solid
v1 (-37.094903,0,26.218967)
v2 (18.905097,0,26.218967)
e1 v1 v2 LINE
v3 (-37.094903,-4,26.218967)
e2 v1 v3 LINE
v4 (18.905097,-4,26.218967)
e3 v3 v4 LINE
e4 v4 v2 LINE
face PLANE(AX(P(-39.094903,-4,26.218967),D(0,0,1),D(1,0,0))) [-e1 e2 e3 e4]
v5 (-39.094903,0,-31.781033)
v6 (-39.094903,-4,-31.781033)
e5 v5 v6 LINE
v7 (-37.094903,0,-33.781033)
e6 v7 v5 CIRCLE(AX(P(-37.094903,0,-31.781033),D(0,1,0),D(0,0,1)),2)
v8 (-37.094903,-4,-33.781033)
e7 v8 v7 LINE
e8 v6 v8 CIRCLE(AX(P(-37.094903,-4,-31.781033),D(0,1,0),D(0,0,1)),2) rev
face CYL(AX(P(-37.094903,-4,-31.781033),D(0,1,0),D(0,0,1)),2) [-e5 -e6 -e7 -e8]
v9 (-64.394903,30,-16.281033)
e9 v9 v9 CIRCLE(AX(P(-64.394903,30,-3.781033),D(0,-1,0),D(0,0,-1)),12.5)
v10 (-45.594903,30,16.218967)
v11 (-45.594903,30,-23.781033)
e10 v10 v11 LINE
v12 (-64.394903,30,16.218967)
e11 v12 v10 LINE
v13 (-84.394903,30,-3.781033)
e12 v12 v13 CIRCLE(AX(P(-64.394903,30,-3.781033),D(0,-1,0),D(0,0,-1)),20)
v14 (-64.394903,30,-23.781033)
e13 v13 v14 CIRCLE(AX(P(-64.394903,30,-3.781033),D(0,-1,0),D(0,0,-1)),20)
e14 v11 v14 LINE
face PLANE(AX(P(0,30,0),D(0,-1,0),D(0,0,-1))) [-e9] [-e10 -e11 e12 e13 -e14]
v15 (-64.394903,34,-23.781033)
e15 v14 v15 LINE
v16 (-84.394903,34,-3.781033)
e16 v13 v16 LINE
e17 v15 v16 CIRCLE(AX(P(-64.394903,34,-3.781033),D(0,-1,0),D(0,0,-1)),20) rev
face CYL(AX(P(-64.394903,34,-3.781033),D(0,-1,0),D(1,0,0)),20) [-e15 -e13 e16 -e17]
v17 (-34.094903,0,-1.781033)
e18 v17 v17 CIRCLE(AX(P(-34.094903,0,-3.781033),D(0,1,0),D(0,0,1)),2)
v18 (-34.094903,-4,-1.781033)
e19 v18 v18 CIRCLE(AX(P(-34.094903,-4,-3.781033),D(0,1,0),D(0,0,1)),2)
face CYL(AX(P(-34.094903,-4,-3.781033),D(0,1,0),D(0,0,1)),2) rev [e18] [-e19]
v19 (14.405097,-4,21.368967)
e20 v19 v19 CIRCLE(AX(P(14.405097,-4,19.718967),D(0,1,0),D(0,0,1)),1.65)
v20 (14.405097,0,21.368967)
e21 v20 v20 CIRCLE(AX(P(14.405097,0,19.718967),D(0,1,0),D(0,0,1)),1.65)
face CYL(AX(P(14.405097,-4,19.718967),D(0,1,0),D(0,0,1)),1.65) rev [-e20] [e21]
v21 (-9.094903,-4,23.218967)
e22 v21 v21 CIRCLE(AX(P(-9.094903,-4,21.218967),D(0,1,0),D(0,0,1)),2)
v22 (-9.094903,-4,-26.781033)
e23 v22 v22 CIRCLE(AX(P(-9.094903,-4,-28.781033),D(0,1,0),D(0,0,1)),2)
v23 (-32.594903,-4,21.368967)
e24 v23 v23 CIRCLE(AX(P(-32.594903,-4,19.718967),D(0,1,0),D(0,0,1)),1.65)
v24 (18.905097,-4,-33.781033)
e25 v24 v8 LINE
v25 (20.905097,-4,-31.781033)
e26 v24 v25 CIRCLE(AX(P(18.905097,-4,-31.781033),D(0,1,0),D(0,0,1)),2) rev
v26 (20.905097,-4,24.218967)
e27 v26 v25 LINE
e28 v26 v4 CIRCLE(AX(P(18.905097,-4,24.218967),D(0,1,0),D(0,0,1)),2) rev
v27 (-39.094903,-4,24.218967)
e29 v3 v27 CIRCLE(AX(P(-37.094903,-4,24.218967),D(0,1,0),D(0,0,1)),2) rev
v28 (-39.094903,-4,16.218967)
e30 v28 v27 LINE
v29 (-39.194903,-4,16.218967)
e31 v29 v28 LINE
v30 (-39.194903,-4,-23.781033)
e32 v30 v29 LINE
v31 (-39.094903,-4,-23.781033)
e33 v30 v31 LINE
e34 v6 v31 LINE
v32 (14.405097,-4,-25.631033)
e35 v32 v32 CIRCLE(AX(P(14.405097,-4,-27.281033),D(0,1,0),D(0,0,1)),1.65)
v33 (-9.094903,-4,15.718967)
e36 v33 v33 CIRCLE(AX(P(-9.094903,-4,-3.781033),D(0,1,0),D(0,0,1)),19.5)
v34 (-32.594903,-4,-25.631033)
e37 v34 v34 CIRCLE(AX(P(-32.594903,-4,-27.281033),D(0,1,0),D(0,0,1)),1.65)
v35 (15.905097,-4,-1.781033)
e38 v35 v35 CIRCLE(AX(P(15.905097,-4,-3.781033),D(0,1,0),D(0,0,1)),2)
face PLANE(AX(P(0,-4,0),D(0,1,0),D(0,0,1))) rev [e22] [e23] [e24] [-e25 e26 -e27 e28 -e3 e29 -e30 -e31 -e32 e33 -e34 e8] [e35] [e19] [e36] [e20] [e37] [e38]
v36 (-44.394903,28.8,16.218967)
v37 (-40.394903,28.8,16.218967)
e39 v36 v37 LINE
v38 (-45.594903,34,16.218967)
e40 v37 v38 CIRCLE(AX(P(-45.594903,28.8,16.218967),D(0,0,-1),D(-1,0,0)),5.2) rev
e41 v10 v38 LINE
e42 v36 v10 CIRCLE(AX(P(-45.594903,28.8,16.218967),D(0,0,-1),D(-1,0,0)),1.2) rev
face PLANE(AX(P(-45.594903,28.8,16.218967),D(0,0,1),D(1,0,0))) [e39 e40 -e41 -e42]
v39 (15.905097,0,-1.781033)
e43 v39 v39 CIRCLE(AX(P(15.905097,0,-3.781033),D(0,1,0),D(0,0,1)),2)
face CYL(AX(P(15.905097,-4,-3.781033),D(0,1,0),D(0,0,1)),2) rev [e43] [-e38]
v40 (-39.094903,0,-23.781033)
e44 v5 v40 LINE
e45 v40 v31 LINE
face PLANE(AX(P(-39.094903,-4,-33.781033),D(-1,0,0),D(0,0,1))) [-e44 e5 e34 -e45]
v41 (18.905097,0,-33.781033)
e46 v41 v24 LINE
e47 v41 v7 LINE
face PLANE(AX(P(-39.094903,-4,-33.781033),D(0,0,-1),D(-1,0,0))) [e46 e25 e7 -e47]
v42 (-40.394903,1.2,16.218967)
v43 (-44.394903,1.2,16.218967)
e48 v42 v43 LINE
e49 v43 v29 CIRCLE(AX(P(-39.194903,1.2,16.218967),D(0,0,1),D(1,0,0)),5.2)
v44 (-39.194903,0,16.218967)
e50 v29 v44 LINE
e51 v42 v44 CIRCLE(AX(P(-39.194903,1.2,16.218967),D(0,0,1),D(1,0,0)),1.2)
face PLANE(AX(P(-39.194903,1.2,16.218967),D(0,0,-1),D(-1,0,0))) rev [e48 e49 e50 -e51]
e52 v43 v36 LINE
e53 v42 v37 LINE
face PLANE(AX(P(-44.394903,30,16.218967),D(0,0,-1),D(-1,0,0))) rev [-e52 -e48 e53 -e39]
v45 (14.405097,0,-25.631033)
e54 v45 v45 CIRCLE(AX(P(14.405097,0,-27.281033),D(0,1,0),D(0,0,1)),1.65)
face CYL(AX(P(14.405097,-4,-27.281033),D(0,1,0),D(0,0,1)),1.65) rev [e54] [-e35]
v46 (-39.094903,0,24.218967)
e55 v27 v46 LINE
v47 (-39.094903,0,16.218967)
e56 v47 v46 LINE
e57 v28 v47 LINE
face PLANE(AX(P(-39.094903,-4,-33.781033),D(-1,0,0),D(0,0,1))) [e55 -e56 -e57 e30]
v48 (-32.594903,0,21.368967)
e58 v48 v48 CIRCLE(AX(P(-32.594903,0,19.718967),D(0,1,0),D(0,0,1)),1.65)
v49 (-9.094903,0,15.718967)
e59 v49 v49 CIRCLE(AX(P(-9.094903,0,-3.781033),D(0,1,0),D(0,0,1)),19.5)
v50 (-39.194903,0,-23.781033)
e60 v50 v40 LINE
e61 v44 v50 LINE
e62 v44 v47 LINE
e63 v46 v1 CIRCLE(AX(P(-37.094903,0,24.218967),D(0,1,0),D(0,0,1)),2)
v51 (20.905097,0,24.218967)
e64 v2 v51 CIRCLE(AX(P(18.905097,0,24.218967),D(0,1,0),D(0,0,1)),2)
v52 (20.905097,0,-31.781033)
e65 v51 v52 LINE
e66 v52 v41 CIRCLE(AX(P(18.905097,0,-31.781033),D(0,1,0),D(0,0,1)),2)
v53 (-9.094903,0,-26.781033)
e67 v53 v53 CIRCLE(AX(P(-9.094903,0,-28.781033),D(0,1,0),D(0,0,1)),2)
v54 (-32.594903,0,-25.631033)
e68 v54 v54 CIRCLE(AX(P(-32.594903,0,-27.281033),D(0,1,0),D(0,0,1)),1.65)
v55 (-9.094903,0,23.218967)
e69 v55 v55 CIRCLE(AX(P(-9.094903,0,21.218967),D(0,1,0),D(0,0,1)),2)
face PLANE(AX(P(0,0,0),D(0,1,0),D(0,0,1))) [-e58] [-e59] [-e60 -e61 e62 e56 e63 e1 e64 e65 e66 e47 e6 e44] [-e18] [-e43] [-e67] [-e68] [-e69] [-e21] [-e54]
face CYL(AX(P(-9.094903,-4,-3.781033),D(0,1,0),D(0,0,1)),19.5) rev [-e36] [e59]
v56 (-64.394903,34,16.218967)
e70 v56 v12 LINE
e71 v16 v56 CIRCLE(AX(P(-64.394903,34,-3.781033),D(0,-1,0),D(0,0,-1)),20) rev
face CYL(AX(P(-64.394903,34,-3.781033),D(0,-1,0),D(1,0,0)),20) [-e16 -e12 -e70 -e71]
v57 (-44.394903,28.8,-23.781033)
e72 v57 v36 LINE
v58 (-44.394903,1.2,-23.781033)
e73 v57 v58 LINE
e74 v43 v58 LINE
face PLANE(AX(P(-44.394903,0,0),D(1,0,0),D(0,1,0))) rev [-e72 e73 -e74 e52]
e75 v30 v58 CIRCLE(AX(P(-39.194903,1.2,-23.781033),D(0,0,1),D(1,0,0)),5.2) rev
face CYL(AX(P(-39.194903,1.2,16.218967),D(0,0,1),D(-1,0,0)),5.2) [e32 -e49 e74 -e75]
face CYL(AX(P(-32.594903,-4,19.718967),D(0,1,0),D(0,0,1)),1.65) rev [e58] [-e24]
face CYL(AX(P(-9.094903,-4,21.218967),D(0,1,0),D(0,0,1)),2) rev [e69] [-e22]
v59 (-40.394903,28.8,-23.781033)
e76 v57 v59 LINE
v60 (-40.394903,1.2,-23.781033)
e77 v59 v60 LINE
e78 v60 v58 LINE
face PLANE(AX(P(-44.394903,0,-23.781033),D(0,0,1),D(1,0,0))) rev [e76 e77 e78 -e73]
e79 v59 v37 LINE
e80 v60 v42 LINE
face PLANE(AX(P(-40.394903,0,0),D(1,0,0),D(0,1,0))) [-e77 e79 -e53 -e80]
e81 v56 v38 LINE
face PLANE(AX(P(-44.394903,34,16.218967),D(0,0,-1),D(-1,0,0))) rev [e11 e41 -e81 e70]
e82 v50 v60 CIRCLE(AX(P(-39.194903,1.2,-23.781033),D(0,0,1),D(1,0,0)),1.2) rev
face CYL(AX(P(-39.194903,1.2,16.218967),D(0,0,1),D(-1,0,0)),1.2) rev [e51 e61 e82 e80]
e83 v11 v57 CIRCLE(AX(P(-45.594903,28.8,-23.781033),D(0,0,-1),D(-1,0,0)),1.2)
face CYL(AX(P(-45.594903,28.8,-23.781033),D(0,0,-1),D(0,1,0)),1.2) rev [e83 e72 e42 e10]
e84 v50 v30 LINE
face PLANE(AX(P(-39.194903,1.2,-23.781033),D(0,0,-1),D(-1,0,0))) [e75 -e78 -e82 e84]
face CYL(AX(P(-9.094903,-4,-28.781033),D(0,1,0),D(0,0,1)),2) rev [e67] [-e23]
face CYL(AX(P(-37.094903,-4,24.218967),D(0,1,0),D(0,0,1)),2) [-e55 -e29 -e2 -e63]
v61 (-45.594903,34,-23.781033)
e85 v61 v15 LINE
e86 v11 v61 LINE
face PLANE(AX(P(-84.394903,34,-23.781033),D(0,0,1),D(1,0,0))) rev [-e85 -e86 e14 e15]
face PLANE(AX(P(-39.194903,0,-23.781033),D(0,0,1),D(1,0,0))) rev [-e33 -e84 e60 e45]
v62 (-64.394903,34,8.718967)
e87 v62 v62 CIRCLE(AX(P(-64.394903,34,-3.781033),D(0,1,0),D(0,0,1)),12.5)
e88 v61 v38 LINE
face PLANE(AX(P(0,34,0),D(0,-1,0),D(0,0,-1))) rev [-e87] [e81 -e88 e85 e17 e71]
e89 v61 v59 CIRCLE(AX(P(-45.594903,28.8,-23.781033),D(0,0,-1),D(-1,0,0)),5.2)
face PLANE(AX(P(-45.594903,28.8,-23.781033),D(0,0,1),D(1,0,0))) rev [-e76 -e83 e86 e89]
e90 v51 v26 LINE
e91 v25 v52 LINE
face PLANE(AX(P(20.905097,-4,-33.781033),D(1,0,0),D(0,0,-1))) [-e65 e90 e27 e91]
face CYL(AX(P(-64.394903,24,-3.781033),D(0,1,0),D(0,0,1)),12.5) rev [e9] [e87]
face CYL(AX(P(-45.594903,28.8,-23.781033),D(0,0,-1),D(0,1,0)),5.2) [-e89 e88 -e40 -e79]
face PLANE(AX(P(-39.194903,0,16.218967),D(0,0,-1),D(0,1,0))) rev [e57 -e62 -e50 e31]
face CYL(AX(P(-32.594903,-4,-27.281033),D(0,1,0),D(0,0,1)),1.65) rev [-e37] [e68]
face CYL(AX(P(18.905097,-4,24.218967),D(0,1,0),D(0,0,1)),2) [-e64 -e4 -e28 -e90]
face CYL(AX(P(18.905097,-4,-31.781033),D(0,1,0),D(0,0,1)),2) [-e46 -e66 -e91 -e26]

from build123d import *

# Parameters (mm, degrees)
SKETCH_1_W                       = 60
SKETCH_1_H                       = 60
SKETCH_1_R                       = 1.65
SKETCH_1_R_2                     = 19.5
SKETCH_1_R_3                     = 2
SM_BASE_FLANGE_1_DEPTH           = 4
SKETCH_4_W                       = 40
SKETCH_4_H                       = 4
EXTRUDE_1_DEPTH                  = 0.1
SM_EDGE_FLANGE_1_DEPTH           = 40
SM_EDGE_FLANGE_2_STRIP_W         = 18.4
SM_EDGE_FLANGE_2_STRIP_H         = 4
SM_EDGE_FLANGE_2_STRIP_CUT_DEPTH = 40
SM_EDGE_FLANGE_2_DEPTH           = 40
FILLET_1_R                       = 2
SKETCH_11_R                      = 12.5
CUT_EXTRUDE_1_DEPTH              = 10
FILLET_2_R                       = 20


# Sheet-metal steps are written as plain solids
with BuildPart() as part:
    # Sketch 1 → Базовая кромка1 (new body)
    with BuildSketch(Plane(origin=(0, 0, 0), x_dir=(1, 0, 0), z_dir=(0, 1, 0))):
        with Locations((-9.094903125, 3.781032797)):
            Rectangle(SKETCH_1_W, SKETCH_1_H)
        with Locations(Location((-32.594903125, 27.281032797, 0), (0, 0, 270))):
            Circle(SKETCH_1_R, mode=Mode.SUBTRACT)
        with Locations(Location((14.405096875, 27.281032797, 0), (0, 0, 270))):
            Circle(SKETCH_1_R, mode=Mode.SUBTRACT)
        with Locations(Location((-32.594903125, -19.718967203, 0), (0, 0, 270))):
            Circle(SKETCH_1_R, mode=Mode.SUBTRACT)
        with Locations(Location((14.405096875, -19.718967203, 0), (0, 0, 270))):
            Circle(SKETCH_1_R, mode=Mode.SUBTRACT)
        with Locations(Location((-9.094903125, 3.781032797, 0), (0, 0, 270))):
            Circle(SKETCH_1_R_2, mode=Mode.SUBTRACT)
        with Locations(Location((-34.094903125, 3.781032797, 0), (0, 0, 270))):
            Circle(SKETCH_1_R_3, mode=Mode.SUBTRACT)
        with Locations(Location((15.905096875, 3.781032797, 0), (0, 0, 270))):
            Circle(SKETCH_1_R_3, mode=Mode.SUBTRACT)
        with Locations(Location((-9.094903125, 28.781032797, 0), (0, 0, 270))):
            Circle(SKETCH_1_R_3, mode=Mode.SUBTRACT)
        with Locations(Location((-9.094903125, -21.218967203, 0), (0, 0, 270))):
            Circle(SKETCH_1_R_3, mode=Mode.SUBTRACT)
    extrude(amount=-SM_BASE_FLANGE_1_DEPTH)

    # Эскиз4 → Бобышка-Вытянуть1 (add)
    with BuildSketch(Plane.ZY.offset(39.094903125)):
        with Locations((-3.781032797, -2)):
            Rectangle(SKETCH_4_W, SKETCH_4_H)
    extrude(amount=EXTRUDE_1_DEPTH)

    # Ребро-кромка1 section (across the edge) → Ребро-кромка1 (add)
    with BuildSketch(Plane(origin=(-40.394903125, 0, -23.781032797), x_dir=(1, 0, 0), z_dir=(0, 0, 1))):
        with BuildLine():
            Line((-4, 1.2), (-4, 30))
            Line((-4, 30), (0, 30))
            Line((0, 30), (0, 1.2))
            ThreePointArc((0, 1.2), (0.351471863, 0.351471863), (1.2, 0))
            Line((1.2, 0), (1.2, -4))
            ThreePointArc((1.2, -4), (-2.476955262, -2.476955262), (-4, 1.2))
        make_face()
    extrude(amount=SM_EDGE_FLANGE_1_DEPTH)

    # Ребро-кромка2 strip (across the edge) → Ребро-кромка2 strip cut (cut)
    with BuildSketch(Plane(origin=(-44.394903125, 30, 16.218967203), x_dir=(0, -1, 0), z_dir=(0, 0, -1))):
        with Locations((-8, -2)):
            Rectangle(SM_EDGE_FLANGE_2_STRIP_W, SM_EDGE_FLANGE_2_STRIP_H)
    extrude(amount=SM_EDGE_FLANGE_2_STRIP_CUT_DEPTH, mode=Mode.SUBTRACT)

    # Ребро-кромка2 section (across the edge) → Ребро-кромка2 (add)
    with BuildSketch(Plane(origin=(-44.394903125, 30, 16.218967203), x_dir=(0, -1, 0), z_dir=(0, 0, -1))):
        with BuildLine():
            Line((-4, 1.2), (-4, 40))
            Line((-4, 40), (0, 40))
            Line((0, 40), (0, 1.2))
            ThreePointArc((0, 1.2), (0.351471863, 0.351471863), (1.2, 0))
            Line((1.2, 0), (1.2, -4))
            ThreePointArc((1.2, -4), (-2.476955262, -2.476955262), (-4, 1.2))
        make_face()
    extrude(amount=SM_EDGE_FLANGE_2_DEPTH)

    # Скругление1
    fillet_1_edges = [part.edges().sort_by_distance(p)[0] for p in [
        (-39.094903125, -2, -33.781032797),
        (20.905096875, -2, -33.781032797),
        (20.905096875, -2, 26.218967203),
        (-39.094903125, -2, 26.218967203),
    ]]
    fillet(fillet_1_edges, radius=FILLET_1_R)

    # Эскиз11 → Вырез-Вытянуть1 (cut)
    with BuildSketch(Plane(origin=(0, 34, 0), x_dir=(1, 0, 0), z_dir=(0, 1, 0))):
        with Locations(Location((-64.394903125, 3.781032797, 0), (0, 0, 270))):
            Circle(SKETCH_11_R)
    extrude(amount=-CUT_EXTRUDE_1_DEPTH, mode=Mode.SUBTRACT)

    # Скругление2
    fillet_2_edges = [part.edges().sort_by_distance(p)[0] for p in [
        (-84.394903125, 32, -23.781032797),
        (-84.394903125, 32, 16.218967203),
    ]]
    fillet(fillet_2_edges, radius=FILLET_2_R - 0.0001)  # a hair under: the kernel refuses the full size


solid = part.part
